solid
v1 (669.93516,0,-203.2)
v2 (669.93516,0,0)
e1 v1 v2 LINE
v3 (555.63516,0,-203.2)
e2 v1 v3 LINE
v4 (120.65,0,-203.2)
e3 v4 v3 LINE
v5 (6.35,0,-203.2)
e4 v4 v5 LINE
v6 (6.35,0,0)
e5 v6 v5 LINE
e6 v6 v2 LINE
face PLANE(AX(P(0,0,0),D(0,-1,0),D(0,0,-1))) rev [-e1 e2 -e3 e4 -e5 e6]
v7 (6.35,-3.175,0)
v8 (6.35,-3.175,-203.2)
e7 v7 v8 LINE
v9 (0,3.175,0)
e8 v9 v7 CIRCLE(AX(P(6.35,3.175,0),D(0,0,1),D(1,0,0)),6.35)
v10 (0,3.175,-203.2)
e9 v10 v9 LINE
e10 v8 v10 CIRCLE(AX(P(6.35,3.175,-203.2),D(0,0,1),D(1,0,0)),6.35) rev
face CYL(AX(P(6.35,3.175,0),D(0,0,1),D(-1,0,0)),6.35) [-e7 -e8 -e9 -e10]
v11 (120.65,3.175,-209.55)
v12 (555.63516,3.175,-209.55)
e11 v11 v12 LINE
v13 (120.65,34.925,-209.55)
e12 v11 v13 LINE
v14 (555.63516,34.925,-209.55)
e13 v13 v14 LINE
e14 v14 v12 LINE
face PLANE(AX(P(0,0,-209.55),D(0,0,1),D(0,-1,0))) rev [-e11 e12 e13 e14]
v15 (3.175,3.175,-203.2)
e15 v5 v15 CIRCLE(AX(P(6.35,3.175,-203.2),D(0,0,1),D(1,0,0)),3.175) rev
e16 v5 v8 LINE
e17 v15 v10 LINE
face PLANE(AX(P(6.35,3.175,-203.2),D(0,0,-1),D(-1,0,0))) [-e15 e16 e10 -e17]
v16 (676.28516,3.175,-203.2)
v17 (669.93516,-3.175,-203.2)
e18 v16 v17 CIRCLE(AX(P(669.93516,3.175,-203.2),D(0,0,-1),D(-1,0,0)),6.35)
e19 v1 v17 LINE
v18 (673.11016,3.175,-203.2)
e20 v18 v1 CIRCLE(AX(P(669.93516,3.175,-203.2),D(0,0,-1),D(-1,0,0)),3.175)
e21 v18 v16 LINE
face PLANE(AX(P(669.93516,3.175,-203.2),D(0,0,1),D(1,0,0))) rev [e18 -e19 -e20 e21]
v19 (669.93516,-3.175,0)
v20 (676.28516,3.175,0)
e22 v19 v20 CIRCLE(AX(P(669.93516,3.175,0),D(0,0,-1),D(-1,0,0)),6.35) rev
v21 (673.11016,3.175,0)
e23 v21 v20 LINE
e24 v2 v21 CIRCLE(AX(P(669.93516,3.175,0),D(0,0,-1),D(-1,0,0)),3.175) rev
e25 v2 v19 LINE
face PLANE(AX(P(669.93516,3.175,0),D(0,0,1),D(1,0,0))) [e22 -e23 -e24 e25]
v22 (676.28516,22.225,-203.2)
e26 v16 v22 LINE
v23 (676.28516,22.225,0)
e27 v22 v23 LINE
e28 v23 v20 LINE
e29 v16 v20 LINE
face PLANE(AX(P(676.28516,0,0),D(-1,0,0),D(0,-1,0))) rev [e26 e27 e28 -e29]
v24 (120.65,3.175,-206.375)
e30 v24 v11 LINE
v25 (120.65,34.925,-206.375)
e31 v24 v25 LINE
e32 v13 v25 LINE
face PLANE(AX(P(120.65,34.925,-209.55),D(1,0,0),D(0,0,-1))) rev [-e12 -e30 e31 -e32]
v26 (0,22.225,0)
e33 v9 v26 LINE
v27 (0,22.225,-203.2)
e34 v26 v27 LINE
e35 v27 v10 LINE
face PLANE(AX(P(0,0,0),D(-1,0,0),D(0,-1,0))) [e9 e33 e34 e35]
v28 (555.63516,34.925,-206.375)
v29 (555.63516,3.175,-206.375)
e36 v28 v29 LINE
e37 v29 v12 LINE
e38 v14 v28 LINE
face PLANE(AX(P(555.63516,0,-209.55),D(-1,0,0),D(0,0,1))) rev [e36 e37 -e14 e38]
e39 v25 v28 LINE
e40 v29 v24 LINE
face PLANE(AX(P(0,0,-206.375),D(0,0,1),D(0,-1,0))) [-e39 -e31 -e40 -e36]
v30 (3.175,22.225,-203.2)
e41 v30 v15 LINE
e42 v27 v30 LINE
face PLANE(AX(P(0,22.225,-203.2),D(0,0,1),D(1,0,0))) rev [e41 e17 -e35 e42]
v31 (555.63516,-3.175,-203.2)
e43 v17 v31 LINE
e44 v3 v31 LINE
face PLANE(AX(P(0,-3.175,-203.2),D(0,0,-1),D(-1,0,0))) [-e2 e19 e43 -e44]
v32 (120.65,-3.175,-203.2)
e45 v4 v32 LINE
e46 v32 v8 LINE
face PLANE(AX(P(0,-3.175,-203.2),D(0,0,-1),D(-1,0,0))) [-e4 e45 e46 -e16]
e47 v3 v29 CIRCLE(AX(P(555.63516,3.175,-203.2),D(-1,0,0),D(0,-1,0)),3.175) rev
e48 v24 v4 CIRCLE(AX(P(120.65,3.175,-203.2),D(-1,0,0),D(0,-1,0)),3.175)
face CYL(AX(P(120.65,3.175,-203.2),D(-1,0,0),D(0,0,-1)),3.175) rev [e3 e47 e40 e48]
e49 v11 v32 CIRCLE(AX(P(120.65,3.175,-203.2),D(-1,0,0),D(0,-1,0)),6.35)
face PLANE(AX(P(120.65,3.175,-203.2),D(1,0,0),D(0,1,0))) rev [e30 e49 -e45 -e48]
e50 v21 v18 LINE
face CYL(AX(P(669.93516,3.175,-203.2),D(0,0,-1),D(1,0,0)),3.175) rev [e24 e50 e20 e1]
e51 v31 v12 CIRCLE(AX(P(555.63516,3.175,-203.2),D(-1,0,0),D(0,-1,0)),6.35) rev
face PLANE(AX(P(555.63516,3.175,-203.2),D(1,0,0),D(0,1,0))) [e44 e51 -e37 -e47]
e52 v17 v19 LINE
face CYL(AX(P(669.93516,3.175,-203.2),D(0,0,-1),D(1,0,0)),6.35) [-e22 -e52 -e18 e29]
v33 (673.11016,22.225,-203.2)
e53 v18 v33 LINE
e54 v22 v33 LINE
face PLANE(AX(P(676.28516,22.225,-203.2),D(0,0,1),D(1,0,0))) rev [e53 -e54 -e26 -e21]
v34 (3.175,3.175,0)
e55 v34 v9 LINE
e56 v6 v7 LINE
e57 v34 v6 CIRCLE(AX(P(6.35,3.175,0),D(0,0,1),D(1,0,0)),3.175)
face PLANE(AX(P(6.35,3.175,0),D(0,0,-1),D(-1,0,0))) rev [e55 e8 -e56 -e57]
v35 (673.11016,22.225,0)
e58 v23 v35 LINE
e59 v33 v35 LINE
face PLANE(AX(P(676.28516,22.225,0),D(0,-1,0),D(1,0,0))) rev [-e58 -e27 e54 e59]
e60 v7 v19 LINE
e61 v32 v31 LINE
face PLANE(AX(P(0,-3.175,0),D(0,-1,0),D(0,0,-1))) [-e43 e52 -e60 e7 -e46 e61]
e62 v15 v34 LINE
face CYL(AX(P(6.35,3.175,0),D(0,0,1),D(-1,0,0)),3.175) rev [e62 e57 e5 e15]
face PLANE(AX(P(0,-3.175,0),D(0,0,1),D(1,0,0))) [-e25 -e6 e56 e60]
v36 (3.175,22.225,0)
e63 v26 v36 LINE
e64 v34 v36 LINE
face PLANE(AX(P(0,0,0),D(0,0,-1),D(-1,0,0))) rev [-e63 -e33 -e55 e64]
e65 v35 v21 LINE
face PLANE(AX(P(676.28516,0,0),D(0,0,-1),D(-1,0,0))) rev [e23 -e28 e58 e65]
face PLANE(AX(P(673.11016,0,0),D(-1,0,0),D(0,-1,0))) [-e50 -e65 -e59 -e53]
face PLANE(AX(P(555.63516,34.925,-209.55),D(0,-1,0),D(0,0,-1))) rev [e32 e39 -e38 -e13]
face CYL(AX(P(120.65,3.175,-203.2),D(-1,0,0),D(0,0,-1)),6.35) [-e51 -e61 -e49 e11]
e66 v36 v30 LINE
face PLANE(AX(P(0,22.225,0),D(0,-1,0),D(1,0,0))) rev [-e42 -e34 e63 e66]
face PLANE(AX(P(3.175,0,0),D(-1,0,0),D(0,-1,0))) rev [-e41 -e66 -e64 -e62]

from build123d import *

# Parameters (mm, degrees)
SKETCH1_W                      = 676.28516
SKETCH1_H                      = 203.2
BASE_FLANGE1_DEPTH             = 3.175
EDGE_FLANGE2_STRIP_W           = 19.05
EDGE_FLANGE2_STRIP_H           = 3.175
EDGE_FLANGE2_STRIP_CUT_DEPTH   = 203.2
EDGE_FLANGE2_STRIP_2_W         = 19.05
EDGE_FLANGE2_STRIP_2_H         = 3.175
EDGE_FLANGE2_STRIP_CUT_2_DEPTH = 203.2
EDGE_FLANGE2_DEPTH             = 203.2
EDGE_FLANGE2_BEND_DEPTH        = 203.2
EDGE_FLANGE3_DEPTH             = 434.98516


# Sheet-metal steps are written as plain solids
with BuildPart() as part:
    # Sketch1 → Base-Flange1 (new body)
    with BuildSketch(Plane(origin=(0, 0, 0), x_dir=(1, 0, 0), z_dir=(0, 1, 0))):
        with Locations((338.14258, 101.6)):
            Rectangle(SKETCH1_W, SKETCH1_H)
    extrude(amount=-BASE_FLANGE1_DEPTH)

    # Edge-Flange2 strip (across the edge) → Edge-Flange2 strip cut (cut)
    with BuildSketch(Plane(origin=(676.28516, 0, 0), x_dir=(-1, 0, 0), z_dir=(0, 0, -1))):
        with Locations((-3.175, -1.5875)):
            Rectangle(EDGE_FLANGE2_STRIP_W, EDGE_FLANGE2_STRIP_H)
    extrude(amount=EDGE_FLANGE2_STRIP_CUT_DEPTH, mode=Mode.SUBTRACT)

    # Edge-Flange2 strip 2 (across the edge) → Edge-Flange2 strip cut 2 (cut)
    with BuildSketch(Plane.XY.offset(-203.2)):
        with Locations((-3.175, -1.5875)):
            Rectangle(EDGE_FLANGE2_STRIP_2_W, EDGE_FLANGE2_STRIP_2_H)
    extrude(amount=EDGE_FLANGE2_STRIP_CUT_2_DEPTH, mode=Mode.SUBTRACT)

    # Edge-Flange2 section (across the edge) → Edge-Flange2 (add)
    with BuildSketch(Plane(origin=(676.28516, 0, 0), x_dir=(-1, 0, 0), z_dir=(0, 0, -1))):
        with BuildLine():
            Line((0, 3.175), (0, 22.225))
            Line((0, 22.225), (3.175, 22.225))
            Line((3.175, 22.225), (3.175, 3.175))
            ThreePointArc((3.175, 3.175), (4.10493597, 0.92993597), (6.35, 0))
            Line((6.35, 0), (6.35, -3.175))
            ThreePointArc((6.35, -3.175), (1.859871939, -1.315128061), (0, 3.175))
        make_face()
    extrude(amount=EDGE_FLANGE2_DEPTH)

    # Edge-Flange2 section 2 (across the edge) → Edge-Flange2 bend (add)
    with BuildSketch(Plane.XY.offset(-203.2)):
        with BuildLine():
            Line((0, 3.175), (0, 22.225))
            Line((0, 22.225), (3.175, 22.225))
            Line((3.175, 22.225), (3.175, 3.175))
            ThreePointArc((3.175, 3.175), (4.10493597, 0.92993597), (6.35, 0))
            Line((6.35, 0), (6.35, -3.175))
            ThreePointArc((6.35, -3.175), (1.859871939, -1.315128061), (0, 3.175))
        make_face()
    extrude(amount=EDGE_FLANGE2_BEND_DEPTH)

    # Edge-Flange3 section (across the edge) → Edge-Flange3 (add)
    with BuildSketch(Plane(origin=(555.63516, 0, -206.375), x_dir=(0, 0, 1), z_dir=(-1, 0, 0))):
        with BuildLine():
            Line((-3.175, 3.175), (-3.175, 34.925))
            Line((-3.175, 34.925), (0, 34.925))
            Line((0, 34.925), (0, 3.175))
            ThreePointArc((0, 3.175), (0.92993597, 0.92993597), (3.175, 0))
            Line((3.175, 0), (3.175, -3.175))
            ThreePointArc((3.175, -3.175), (-1.315128061, -1.315128061), (-3.175, 3.175))
        make_face()
    extrude(amount=EDGE_FLANGE3_DEPTH)


solid = part.part
